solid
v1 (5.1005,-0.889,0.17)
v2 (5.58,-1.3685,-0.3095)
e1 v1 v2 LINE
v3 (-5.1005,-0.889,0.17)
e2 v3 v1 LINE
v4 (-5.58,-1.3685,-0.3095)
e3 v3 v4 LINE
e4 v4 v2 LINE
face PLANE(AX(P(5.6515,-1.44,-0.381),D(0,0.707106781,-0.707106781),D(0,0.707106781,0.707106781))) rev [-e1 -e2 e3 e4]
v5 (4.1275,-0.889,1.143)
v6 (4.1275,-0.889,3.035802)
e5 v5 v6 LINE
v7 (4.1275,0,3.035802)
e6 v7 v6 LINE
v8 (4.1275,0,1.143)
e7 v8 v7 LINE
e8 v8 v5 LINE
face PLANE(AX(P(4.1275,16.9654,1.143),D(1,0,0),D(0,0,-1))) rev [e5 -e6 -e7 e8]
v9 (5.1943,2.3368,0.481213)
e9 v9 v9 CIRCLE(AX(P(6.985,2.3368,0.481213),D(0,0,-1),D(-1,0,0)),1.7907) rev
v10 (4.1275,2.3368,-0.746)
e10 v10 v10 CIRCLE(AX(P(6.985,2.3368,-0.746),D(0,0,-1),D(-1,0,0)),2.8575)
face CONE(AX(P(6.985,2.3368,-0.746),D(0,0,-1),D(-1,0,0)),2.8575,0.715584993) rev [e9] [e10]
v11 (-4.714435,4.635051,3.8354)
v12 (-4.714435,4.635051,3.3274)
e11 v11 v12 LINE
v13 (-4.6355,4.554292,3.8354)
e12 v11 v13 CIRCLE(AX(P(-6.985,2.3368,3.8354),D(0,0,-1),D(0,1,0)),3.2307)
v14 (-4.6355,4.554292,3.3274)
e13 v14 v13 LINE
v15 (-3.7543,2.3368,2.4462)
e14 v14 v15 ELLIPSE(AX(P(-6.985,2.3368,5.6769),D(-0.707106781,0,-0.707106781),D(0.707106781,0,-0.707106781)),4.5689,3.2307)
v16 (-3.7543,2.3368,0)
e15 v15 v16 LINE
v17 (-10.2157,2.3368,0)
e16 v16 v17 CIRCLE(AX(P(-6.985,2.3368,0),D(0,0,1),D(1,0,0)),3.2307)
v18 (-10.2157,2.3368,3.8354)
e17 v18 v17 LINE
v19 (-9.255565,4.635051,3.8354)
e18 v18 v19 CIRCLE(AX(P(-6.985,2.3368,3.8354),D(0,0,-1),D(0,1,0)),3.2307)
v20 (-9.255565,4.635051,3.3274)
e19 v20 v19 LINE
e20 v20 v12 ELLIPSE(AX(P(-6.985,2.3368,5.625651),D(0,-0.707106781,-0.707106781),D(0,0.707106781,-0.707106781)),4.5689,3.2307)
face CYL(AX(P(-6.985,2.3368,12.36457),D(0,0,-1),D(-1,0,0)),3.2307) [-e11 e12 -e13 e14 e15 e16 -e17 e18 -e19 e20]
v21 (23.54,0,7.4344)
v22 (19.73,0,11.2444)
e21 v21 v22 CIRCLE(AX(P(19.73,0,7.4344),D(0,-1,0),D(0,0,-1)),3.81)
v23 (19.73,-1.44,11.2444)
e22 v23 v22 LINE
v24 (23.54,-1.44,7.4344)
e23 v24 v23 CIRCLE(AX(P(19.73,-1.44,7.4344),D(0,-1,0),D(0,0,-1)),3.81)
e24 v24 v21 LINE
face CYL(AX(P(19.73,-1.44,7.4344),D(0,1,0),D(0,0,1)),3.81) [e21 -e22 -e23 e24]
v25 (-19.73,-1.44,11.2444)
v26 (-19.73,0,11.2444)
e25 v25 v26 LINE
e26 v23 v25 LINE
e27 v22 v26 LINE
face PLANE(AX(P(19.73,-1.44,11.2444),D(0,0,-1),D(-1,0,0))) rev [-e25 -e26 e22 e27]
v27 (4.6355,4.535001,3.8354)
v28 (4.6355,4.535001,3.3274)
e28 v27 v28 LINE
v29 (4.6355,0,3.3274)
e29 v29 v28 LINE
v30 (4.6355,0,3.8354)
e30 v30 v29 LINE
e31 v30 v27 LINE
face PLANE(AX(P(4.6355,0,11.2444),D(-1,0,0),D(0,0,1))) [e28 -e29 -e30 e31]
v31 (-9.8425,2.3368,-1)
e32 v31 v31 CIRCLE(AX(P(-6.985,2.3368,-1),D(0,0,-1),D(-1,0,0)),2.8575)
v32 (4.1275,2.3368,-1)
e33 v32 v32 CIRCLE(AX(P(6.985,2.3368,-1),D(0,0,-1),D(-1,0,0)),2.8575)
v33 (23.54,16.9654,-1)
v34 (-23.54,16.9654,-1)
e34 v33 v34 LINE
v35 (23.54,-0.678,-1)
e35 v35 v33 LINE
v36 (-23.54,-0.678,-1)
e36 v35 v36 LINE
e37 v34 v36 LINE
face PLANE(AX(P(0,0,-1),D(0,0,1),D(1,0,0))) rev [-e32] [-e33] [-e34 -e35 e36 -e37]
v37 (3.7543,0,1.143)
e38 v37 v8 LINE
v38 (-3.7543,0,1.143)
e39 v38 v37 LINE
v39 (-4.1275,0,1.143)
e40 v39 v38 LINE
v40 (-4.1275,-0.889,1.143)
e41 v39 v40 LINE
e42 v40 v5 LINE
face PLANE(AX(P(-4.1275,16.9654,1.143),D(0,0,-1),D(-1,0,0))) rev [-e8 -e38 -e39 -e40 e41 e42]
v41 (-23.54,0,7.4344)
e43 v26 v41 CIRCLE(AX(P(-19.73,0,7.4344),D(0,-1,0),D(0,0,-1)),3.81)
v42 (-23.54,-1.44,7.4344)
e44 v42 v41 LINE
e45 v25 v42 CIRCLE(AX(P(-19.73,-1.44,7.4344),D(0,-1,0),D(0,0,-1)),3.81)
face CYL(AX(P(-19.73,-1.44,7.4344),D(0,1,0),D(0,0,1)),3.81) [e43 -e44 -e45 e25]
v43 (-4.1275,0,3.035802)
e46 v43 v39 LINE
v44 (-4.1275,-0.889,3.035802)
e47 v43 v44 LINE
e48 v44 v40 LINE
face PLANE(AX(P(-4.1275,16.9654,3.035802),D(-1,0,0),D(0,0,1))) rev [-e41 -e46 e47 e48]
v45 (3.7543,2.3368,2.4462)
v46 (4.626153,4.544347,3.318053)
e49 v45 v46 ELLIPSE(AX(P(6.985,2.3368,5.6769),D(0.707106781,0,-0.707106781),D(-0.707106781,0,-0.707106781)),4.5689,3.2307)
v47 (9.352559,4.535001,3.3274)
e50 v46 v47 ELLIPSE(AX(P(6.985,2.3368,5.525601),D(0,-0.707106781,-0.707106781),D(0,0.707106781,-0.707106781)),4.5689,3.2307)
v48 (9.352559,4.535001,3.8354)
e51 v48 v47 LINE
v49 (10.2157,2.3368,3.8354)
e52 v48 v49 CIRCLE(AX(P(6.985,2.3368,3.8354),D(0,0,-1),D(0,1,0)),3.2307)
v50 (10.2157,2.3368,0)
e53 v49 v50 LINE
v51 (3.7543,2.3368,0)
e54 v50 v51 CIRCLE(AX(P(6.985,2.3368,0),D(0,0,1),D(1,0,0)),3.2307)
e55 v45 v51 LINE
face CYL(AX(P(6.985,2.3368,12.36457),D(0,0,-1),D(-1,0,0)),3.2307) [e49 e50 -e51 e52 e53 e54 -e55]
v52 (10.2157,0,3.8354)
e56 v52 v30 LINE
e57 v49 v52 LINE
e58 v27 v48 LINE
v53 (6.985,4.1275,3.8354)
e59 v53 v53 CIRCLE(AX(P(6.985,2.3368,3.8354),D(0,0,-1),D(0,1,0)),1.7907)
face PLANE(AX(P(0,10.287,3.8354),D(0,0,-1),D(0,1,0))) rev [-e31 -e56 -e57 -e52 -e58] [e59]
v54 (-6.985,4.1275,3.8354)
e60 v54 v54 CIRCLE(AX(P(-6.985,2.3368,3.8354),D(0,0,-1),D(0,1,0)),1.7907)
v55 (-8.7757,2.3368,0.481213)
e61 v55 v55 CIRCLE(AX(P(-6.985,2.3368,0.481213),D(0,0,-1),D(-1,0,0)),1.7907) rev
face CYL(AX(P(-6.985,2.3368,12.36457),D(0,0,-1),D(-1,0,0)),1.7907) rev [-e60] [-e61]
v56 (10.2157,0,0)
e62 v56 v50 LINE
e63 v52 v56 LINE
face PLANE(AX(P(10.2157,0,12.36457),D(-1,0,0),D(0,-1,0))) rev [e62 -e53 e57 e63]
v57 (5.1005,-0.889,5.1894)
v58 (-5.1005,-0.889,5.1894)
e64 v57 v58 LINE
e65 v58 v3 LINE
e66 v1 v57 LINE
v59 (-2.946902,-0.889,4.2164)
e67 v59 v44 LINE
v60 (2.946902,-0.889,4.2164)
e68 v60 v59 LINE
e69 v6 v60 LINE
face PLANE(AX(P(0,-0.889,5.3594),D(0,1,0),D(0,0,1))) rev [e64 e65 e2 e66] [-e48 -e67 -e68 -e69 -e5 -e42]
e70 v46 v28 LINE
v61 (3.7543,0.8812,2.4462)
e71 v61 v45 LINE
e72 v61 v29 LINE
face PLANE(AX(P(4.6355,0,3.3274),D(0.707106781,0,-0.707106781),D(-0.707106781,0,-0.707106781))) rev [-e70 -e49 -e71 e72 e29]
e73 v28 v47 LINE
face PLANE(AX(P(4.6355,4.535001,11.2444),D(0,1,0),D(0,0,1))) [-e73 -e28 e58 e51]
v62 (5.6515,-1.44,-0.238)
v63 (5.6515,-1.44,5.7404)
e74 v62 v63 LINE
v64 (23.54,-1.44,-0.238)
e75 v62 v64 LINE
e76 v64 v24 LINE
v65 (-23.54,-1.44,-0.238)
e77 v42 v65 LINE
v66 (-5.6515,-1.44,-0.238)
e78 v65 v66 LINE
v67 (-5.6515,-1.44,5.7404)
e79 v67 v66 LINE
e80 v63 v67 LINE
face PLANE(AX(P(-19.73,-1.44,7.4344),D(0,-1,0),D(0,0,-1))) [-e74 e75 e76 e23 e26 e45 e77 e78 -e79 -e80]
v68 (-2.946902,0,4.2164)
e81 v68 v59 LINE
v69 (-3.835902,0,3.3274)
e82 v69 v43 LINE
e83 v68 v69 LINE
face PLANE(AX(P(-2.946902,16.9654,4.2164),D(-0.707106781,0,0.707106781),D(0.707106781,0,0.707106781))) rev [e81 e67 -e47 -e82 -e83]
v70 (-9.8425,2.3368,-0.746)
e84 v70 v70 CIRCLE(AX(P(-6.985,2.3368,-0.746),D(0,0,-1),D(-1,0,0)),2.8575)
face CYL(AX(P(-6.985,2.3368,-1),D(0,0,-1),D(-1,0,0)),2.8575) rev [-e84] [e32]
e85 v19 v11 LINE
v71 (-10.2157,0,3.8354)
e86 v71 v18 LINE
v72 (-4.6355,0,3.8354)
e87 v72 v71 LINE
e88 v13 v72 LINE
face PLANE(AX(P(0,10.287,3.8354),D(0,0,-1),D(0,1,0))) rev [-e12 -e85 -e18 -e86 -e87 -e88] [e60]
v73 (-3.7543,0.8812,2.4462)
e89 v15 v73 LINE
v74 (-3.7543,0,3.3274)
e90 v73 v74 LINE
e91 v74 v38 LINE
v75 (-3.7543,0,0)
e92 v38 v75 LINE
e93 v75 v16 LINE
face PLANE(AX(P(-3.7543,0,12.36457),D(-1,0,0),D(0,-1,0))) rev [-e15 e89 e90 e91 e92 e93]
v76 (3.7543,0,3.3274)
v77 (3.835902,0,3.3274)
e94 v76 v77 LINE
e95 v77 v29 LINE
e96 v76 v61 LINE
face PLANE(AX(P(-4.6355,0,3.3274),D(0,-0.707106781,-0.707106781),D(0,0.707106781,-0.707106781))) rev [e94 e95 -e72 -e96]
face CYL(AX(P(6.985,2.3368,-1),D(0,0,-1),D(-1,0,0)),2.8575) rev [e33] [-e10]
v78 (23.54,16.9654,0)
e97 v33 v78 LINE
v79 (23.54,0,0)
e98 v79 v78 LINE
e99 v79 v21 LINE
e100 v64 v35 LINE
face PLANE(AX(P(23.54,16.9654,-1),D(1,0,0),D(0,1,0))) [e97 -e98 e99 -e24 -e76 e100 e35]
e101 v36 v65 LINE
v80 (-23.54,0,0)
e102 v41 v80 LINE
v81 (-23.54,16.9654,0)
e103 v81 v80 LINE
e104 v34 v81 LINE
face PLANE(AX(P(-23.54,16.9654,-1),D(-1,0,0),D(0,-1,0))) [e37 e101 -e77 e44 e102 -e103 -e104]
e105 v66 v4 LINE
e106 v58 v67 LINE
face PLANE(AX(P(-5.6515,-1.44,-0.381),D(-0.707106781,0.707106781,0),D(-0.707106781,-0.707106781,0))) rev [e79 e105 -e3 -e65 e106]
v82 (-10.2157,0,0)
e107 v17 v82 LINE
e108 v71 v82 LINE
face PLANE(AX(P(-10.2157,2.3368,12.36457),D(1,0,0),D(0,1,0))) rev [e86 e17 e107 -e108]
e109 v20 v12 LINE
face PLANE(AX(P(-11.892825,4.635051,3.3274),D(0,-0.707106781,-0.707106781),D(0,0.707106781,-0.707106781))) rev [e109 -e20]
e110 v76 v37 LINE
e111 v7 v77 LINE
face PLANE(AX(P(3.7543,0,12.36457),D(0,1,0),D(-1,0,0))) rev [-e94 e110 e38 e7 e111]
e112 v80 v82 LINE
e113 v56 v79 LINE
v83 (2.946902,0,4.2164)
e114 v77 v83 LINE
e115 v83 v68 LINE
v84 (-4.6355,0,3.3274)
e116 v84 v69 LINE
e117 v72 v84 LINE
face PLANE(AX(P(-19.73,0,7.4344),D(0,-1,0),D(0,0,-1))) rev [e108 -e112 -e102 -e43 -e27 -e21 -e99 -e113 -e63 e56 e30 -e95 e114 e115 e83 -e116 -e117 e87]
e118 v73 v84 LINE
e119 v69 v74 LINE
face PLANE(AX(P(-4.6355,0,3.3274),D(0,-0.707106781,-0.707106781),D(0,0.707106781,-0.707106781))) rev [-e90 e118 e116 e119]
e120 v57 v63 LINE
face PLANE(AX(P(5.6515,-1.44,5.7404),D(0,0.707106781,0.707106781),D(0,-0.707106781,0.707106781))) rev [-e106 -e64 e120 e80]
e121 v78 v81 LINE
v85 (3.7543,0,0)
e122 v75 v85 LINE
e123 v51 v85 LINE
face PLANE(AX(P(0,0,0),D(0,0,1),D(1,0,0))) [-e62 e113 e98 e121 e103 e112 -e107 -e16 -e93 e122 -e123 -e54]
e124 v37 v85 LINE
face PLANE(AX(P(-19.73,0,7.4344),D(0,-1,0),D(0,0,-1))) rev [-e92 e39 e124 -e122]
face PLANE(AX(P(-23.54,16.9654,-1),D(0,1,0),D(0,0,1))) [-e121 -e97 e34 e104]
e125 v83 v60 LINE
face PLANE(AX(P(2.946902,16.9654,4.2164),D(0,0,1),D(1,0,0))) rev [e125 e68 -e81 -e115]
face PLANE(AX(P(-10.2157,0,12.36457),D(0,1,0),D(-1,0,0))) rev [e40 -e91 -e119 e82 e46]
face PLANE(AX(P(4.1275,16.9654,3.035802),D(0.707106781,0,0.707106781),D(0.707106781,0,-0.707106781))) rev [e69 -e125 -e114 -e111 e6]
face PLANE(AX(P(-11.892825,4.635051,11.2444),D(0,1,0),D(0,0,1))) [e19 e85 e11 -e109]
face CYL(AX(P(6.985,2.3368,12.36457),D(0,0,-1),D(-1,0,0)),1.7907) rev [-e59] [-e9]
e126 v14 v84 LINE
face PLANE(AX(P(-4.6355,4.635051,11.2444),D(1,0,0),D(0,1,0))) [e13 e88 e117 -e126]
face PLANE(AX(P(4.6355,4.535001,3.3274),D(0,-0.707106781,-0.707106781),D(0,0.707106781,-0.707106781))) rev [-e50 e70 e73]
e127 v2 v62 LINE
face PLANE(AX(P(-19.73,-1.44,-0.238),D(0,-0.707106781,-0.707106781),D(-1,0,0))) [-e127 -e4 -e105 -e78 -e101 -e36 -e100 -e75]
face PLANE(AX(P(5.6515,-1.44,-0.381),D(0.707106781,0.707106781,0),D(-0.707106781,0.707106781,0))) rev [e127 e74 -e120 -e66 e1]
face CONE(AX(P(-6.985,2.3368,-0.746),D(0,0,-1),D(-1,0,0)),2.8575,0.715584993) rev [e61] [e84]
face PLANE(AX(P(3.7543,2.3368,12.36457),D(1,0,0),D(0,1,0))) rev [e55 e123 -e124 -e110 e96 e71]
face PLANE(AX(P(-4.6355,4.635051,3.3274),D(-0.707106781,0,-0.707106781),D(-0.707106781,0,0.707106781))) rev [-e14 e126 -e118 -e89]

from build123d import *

# Parameters (mm, degrees)
BOSS_EXTRUDE1_DEPTH                           = 1
BOSS_EXTRUDE2_DEPTH                           = 1.44
CUT_EXTRUDE1_DEPTH                            = 32.926898982
SKETCH4_W                                     = 11.303
SKETCH4_H                                     = 6.1214
CUT_EXTRUDE2_DEPTH                            = 0.551
CUT_EXTRUDE2_DRAFT                            = -45
SKETCH5_R                                     = 1.7907
BOSS_EXTRUDE3_DEPTH                           = 3.8354
CSK_FOR_4_FLAT_HEAD_MACHINE_SCREW1_AT_2_COUNT = 2
CSK_FOR_4_FLAT_HEAD_MACHINE_SCREW1_AT_2_PITCH = 13.97
CUT_EXTRUDE3_START                            = -0.508
CUT_EXTRUDE3_DEPTH                            = 31.455448587
CUT_EXTRUDE3_OTHER_WAY_DEPTH                  = 2.6924
CUT_EXTRUDE3_OTHER_WAY_TAPER                  = 45
CHAMFER1_SIZE                                 = 0.762


with BuildPart() as part:
    # Sketch1 → Boss-Extrude1 (new body)
    with BuildSketch(Plane.XY):
        Polygon((-23.54, 16.9654), (-6.35, 16.9654), (6.35, 16.9654), (23.54, 16.9654), (23.54, 0), (-23.54, 0), align=None)
    extrude(amount=-BOSS_EXTRUDE1_DEPTH)

    # Sketch2 → Boss-Extrude2 (add)
    with BuildSketch(Plane.XZ):
        with BuildLine():
            Line((-23.54, 0), (-23.54, -1))
            Line((-23.54, -1), (23.54, -1))
            Line((23.54, -1), (23.54, 0))
            Line((23.54, 0), (23.54, 7.434399914))
            ThreePointArc((23.54, 7.434399914), (22.424076836, 10.12847675), (19.73, 11.244399914))
            Line((19.73, 11.244399914), (-19.73, 11.244399914))
            ThreePointArc((-19.73, 11.244399914), (-22.424076836, 10.12847675), (-23.54, 7.434399914))
            Line((-23.54, 7.434399914), (-23.54, 0))
        make_face()
    extrude(amount=BOSS_EXTRUDE2_DEPTH)

    # Sketch3 → Cut-Extrude1 (cut, through all)
    with BuildSketch(Plane.XZ.offset(1.44)):
        Polygon((4.1275, 1.143), (4.1275, 3.035802139), (2.946902139, 4.2164), (-2.946902139, 4.2164), (-4.1275, 3.035802139), (-4.1275, 1.143), align=None)
    extrude(amount=-CUT_EXTRUDE1_DEPTH, mode=Mode.SUBTRACT)


with BuildPart() as cut_extrude2_tool:
    # Sketch4 → Cut-Extrude2 (with draft: the straight prism first)
    with BuildSketch(Plane.XZ.offset(1.44)):
        with Locations((0, 2.6797)):
            Rectangle(SKETCH4_W, SKETCH4_H)
    extrude(amount=-CUT_EXTRUDE2_DEPTH)
    # Cut-Extrude2: the draft: its side faces are tilted about the plane it starts from
    cut_extrude2_sides = [cut_extrude2_tool.faces().sort_by_distance(p)[0] for p in [
        (5.6515, -1.1645, 2.6797),
        (0, -1.1645, 5.7404),
        (-5.6515, -1.1645, 2.6797),
        (0, -1.1645, -0.381),
    ]]
    draft(cut_extrude2_sides, Plane.XZ.offset(1.44), CUT_EXTRUDE2_DRAFT)


with BuildPart() as part_1:
    add(part.part)

    # Cut-Extrude2: cut by cut_extrude2_tool
    add(cut_extrude2_tool.part, mode=Mode.SUBTRACT)

    # Sketch5 → Boss-Extrude3 (add)
    # profile 1 of 2: a face of its own
    with BuildSketch(Plane.XY):
        with BuildLine():
            Line((10.2157, 0), (10.2157, 2.3368))
            ThreePointArc((10.2157, 2.3368), (6.985, 5.5675), (3.7543, 2.3368))
            Line((3.7543, 2.3368), (3.7543, 0))
            Line((3.7543, 0), (10.2157, 0))
        make_face()
        with Locations(Location((6.985, 2.3368, 0), (0, 0, 90))):
            Circle(SKETCH5_R, mode=Mode.SUBTRACT)
    # profile 2 of 2: a face of its own
    with BuildSketch(Plane.XY):
        with BuildLine():
            Line((-3.7543, 0), (-3.7543, 2.3368))
            ThreePointArc((-3.7543, 2.3368), (-6.985, 5.5675), (-10.2157, 2.3368))
            Line((-10.2157, 2.3368), (-10.2157, 0))
            Line((-10.2157, 0), (-3.7543, 0))
        make_face()
        with Locations(Location((-6.985, 2.3368, 0), (0, 0, 90))):
            Circle(SKETCH5_R, mode=Mode.SUBTRACT)
    extrude(amount=BOSS_EXTRUDE3_DEPTH)

    # Sketch7 → CSK for #4 Flat Head Machine Screw1 (revolve, cut)
    with BuildSketch(Plane(origin=(6.985, 2.3368, -1), x_dir=(0, 1, 0), z_dir=(1, 0, 0))):
        Polygon((0, 0), (0, 12.244399914), (1.63195, 12.244399914), (1.63195, 1.663834001), (2.8575, 0.254), (2.8575, 0), align=None)
    csk_for_4_flat_head_machine_screw1 = revolve(axis=Axis((6.985, 2.3368, -7.35), (0, 0, 1)), mode=Mode.SUBTRACT)

    # CSK for #4 Flat Head Machine Screw1 at 2: CSK for #4 Flat Head Machine Screw1 ×2
    with Locations(*[(-i * CSK_FOR_4_FLAT_HEAD_MACHINE_SCREW1_AT_2_PITCH, 0, 0) for i in range(1, CSK_FOR_4_FLAT_HEAD_MACHINE_SCREW1_AT_2_COUNT)]):
        add(csk_for_4_flat_head_machine_screw1, mode=Mode.SUBTRACT)

    # Sketch8 → Cut-Extrude3 (cut)
    with BuildSketch(Plane.XY.offset(3.8354).offset(CUT_EXTRUDE3_START)):
        Polygon((-4.6355, 0), (4.6355, 0), (4.6355, 4.535000865), (11.25247277, 4.535000865), (11.25247277, 13.015959744), (-11.892824973, 13.015959744), (-11.892824973, 4.635051274), (-4.6355, 4.635051274), align=None)
    extrude(amount=CUT_EXTRUDE3_DEPTH, mode=Mode.SUBTRACT)

    # Sketch8 → Cut-Extrude3 other way (cut)
    with BuildSketch(Plane.XY.offset(3.8354).offset(CUT_EXTRUDE3_START)):
        Polygon((-4.6355, 0), (4.6355, 0), (4.6355, 4.535000865), (11.25247277, 4.535000865), (11.25247277, 13.015959744), (-11.892824973, 13.015959744), (-11.892824973, 4.635051274), (-4.6355, 4.635051274), align=None)
    extrude(amount=-CUT_EXTRUDE3_OTHER_WAY_DEPTH, taper=CUT_EXTRUDE3_OTHER_WAY_TAPER, mode=Mode.SUBTRACT)

    # Chamfer1
    # the kernel refuses this chamfer: 0.762 mm, written as the material it takes off along each edge
    with BuildSketch(Plane(origin=(-25.499622437, -1.44, -1), x_dir=(0, 0.9996219169112966, -0.027495876610586417), z_dir=(1, 0, 0))) as chamfer1_piece_1:
        Polygon((CHAMFER1_SIZE * 0.999621916911, CHAMFER1_SIZE * 0.0274958766106), (-CHAMFER1_SIZE * 0.0274958766106, CHAMFER1_SIZE * 0.999621916911), (0, 0), align=None)
    extrude(amount=50.999244874, mode=Mode.SUBTRACT)


solid = part_1.part
